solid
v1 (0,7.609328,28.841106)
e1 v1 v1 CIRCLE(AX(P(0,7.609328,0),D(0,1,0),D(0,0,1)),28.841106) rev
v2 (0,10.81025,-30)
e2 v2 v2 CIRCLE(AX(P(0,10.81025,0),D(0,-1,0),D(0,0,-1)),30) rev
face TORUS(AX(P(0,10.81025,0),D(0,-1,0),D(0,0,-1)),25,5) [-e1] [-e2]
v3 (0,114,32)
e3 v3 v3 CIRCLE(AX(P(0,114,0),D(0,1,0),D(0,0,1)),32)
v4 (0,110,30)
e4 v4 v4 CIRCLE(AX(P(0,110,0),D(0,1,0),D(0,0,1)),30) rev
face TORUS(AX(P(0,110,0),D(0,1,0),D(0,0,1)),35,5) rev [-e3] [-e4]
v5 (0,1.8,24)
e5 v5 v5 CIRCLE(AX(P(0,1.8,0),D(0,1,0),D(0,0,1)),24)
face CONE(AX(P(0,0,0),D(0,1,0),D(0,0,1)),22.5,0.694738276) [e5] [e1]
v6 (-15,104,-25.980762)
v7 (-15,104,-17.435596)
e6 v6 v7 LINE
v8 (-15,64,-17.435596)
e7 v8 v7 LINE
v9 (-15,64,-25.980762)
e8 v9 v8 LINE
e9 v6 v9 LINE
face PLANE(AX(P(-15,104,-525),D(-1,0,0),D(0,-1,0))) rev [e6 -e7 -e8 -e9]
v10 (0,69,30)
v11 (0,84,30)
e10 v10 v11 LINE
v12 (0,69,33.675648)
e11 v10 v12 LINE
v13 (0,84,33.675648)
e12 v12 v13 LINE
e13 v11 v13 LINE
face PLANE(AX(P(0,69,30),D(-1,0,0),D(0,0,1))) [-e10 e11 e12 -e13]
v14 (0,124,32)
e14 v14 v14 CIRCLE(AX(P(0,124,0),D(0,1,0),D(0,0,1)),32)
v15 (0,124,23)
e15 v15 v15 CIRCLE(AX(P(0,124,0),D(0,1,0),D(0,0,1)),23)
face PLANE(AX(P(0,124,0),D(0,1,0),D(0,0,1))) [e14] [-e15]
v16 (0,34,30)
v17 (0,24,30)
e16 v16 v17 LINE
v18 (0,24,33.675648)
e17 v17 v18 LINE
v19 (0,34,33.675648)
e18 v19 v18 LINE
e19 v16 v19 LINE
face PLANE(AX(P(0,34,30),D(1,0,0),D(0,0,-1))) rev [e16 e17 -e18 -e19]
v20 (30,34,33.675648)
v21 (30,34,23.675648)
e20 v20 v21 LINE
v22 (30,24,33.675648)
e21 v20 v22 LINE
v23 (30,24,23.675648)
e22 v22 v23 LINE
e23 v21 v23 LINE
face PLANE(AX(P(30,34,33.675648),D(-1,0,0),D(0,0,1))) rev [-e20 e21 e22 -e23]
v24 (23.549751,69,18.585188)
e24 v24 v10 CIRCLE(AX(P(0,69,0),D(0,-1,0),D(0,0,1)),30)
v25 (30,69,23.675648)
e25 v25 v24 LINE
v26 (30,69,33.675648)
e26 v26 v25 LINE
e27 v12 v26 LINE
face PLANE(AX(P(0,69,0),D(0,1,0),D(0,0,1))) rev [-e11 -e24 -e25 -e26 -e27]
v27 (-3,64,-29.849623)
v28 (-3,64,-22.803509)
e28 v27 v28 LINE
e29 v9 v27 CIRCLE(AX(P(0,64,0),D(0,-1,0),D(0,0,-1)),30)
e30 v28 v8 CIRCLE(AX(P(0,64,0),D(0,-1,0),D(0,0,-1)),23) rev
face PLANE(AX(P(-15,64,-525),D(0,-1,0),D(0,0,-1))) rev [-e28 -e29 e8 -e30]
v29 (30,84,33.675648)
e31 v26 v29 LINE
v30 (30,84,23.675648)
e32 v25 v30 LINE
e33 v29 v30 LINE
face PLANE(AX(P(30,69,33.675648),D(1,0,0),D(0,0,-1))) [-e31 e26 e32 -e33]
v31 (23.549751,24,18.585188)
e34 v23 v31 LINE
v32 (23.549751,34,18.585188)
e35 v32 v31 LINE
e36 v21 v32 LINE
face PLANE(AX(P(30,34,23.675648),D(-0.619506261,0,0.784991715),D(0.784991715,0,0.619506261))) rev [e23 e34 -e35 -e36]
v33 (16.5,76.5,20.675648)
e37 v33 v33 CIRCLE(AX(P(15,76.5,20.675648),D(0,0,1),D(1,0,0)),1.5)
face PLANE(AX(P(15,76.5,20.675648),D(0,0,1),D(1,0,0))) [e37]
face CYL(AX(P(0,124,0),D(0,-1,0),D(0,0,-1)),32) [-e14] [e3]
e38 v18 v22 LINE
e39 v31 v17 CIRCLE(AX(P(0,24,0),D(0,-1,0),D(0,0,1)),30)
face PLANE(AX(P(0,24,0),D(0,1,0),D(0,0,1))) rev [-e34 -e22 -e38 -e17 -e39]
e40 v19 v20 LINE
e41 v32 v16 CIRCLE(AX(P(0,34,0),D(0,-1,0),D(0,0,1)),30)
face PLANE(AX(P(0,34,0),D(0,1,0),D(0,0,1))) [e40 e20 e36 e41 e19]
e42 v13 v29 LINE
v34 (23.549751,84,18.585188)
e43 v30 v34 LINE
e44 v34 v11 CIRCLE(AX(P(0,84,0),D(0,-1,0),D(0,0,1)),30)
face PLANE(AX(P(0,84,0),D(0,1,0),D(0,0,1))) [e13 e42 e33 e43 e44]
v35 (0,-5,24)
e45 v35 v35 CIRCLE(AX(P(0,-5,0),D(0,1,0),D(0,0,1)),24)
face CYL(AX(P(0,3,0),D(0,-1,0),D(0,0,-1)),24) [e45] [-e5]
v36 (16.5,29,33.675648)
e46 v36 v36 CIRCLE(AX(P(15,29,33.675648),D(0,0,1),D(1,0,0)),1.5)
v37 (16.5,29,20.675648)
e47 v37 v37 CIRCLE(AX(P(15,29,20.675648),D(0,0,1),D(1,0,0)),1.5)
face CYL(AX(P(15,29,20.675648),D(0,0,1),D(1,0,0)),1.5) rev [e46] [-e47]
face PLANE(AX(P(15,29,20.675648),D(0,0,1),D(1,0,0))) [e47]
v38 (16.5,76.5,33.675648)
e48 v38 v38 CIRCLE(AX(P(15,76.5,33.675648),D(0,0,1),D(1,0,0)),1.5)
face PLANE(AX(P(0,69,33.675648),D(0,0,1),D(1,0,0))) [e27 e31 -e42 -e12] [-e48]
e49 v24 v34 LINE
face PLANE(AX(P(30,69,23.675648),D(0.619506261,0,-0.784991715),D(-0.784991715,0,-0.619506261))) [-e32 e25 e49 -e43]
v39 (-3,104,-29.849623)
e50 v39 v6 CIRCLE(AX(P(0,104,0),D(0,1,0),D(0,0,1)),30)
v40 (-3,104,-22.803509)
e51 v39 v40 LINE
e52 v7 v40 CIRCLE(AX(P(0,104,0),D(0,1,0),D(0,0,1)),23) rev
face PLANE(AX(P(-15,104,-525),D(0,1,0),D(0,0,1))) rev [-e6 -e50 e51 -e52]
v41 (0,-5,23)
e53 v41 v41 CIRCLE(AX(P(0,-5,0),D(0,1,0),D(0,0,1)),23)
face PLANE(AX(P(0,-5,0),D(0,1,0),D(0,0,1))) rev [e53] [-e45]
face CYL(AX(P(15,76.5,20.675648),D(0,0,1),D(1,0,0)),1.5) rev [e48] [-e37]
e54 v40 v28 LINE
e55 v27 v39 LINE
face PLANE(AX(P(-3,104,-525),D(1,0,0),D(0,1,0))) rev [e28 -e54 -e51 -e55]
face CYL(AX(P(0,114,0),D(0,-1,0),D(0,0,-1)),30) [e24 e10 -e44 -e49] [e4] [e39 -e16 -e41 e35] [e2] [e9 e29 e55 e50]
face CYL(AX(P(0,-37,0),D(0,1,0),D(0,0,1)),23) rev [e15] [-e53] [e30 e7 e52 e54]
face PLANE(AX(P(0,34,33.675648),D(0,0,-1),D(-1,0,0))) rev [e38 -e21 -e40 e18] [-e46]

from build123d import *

# Parameters (mm, degrees)
CROQUIS1_R                   = 22.5
CROQUIS2_R                   = 30
CROQUIS3_R                   = 30
SALIENTE_EXTRUIR1_DEPTH      = 105
CROQUIS4_R                   = 32
SALIENTE_EXTRUIR2_DEPTH      = 10
CROQUIS6_R                   = 23
CORTAR_EXTRUIR1_DEPTH        = 161
SALIENTE_EXTRUIR3_DEPTH      = 3
SALIENTE_EXTRUIR3_DEPTH_BACK = 5
CROQUIS7_R                   = 24
CROQUIS7_R_2                 = 23
REDONDEO1_R                  = 5
CROQUIS9_W                   = 12
CROQUIS9_H                   = 40
CORTAR_EXTRUIR2_DEPTH        = 525
SALIENTE_EXTRUIR4_START      = -15
SALIENTE_EXTRUIR4_DEPTH      = 15
SALIENTE_EXTRUIR5_DEPTH      = 10
CROQUIS12_R                  = 1.5
CORTAR_EXTRUIR3_DEPTH        = 13


with BuildPart() as part:
    # Croquis1 → Recubrir1 section 0
    with BuildSketch(Plane(origin=(0, 0, 0), x_dir=(1, 0, 0), z_dir=(0, 1, 0))):
        Circle(CROQUIS1_R)
    # Croquis2 → Recubrir1 section 1
    with BuildSketch(Plane(origin=(0, 9, 0), x_dir=(1, 0, 0), z_dir=(0, 1, 0))):
        Circle(CROQUIS2_R)
    loft()

    # Croquis3 → Saliente-Extruir1 (add)
    with BuildSketch(Plane(origin=(0, 9, 0), x_dir=(1, 0, 0), z_dir=(0, 1, 0))):
        with Locations(Location((0, 0, 0), (0, 0, 270))):
            Circle(CROQUIS3_R)
    extrude(amount=SALIENTE_EXTRUIR1_DEPTH)

    # Croquis4 → Saliente-Extruir2 (add)
    with BuildSketch(Plane(origin=(0, 114, 0), x_dir=(1, 0, 0), z_dir=(0, 1, 0))):
        with Locations(Location((0, 0, 0), (0, 0, 270))):
            Circle(CROQUIS4_R)
    extrude(amount=SALIENTE_EXTRUIR2_DEPTH)

    # Croquis6 → Cortar-Extruir1 (cut)
    with BuildSketch(Plane(origin=(0, 124, 0), x_dir=(1, 0, 0), z_dir=(0, 1, 0))):
        with Locations(Location((0, 0, 0), (0, 0, 270))):
            Circle(CROQUIS6_R)
    extrude(amount=-CORTAR_EXTRUIR1_DEPTH, mode=Mode.SUBTRACT)

    # Croquis7 → Saliente-Extruir3 (add, two sides: drawn at the far end of the back side and taken through both)
    with BuildSketch(Plane(origin=(0, 0, 0), x_dir=(1, 0, 0), z_dir=(0, 1, 0)).offset(-SALIENTE_EXTRUIR3_DEPTH_BACK)):
        with Locations(Location((0, 0, 0), (0, 0, 270))):
            Circle(CROQUIS7_R)
        with Locations(Location((0, 0, 0), (0, 0, 270))):
            Circle(CROQUIS7_R_2, mode=Mode.SUBTRACT)
    extrude(amount=SALIENTE_EXTRUIR3_DEPTH + SALIENTE_EXTRUIR3_DEPTH_BACK)

    # Redondeo1
    # the kernel refuses this fillet: 5 mm, written as the material it adds along each edge
    with BuildSketch(Plane(origin=(0, 114, 0), x_dir=(0, 0, 1), z_dir=(-1, 0, 0))) as redondeo1_piece_1:
        with BuildLine():
            CenterArc((35, -4), REDONDEO1_R, 126.869897646, 53.130102354)
            Line((32, 0), (30, 0))
            Line((30, 0), (30, -4))
        make_face()
    redondeo1_piece_1_solid = revolve(axis=Axis((0, 114, 0), (0, 1, 0)), mode=Mode.PRIVATE)
    add([redondeo1_piece_1_solid])
    # the kernel refuses this fillet: 5 mm, written as the material it takes off along each edge
    with BuildSketch(Plane(origin=(0, 9, 0), x_dir=(1, 0, 0), z_dir=(0, 0, 1))) as redondeo1_2_piece_1:
        with BuildLine():
            CenterArc((30 - REDONDEO1_R, REDONDEO1_R * 0.362049935181), REDONDEO1_R, 320.194428908, 39.805571092)
            Line((30, REDONDEO1_R * 0.362049935181), (30, 0))
            Line((30, 0), (30 - REDONDEO1_R * 0.231778720403, -REDONDEO1_R * 0.278134464483))
        make_face()
    redondeo1_2_piece_1_solid = revolve(axis=Axis((0, 9, 0), (0, 1, 0)), revolution_arc=270, mode=Mode.PRIVATE)
    with BuildSketch(Plane(origin=(0, 9, 0), x_dir=(0, 0, 1), z_dir=(-1, 0, 0))) as redondeo1_2_piece_2:
        with BuildLine():
            CenterArc((30 - REDONDEO1_R, REDONDEO1_R * 0.362049935181), REDONDEO1_R, 320.194428908, 39.805571092)
            Line((30, REDONDEO1_R * 0.362049935181), (30, 0))
            Line((30, 0), (30 - REDONDEO1_R * 0.231778720403, -REDONDEO1_R * 0.278134464483))
        make_face()
    redondeo1_2_piece_2_solid = revolve(axis=Axis((0, 9, 0), (0, 1, 0)), revolution_arc=90, mode=Mode.PRIVATE)
    add([redondeo1_2_piece_1_solid, redondeo1_2_piece_2_solid], mode=Mode.SUBTRACT)

    # Croquis9 → Cortar-Extruir2 (cut)
    with BuildSketch(Plane.XY):
        with Locations((-9, 84)):
            Rectangle(CROQUIS9_W, CROQUIS9_H)
    extrude(amount=-CORTAR_EXTRUIR2_DEPTH, mode=Mode.SUBTRACT)

    # Croquis10 → Saliente-Extruir4 (add)
    with BuildSketch(Plane(origin=(0, 84, 0), x_dir=(1, 0, 0), z_dir=(0, 1, 0)).offset(SALIENTE_EXTRUIR4_START)):
        with BuildLine():
            Line((0, -30), (0, -33.675648379))
            Line((0, -33.675648379), (30, -33.675648379))
            Line((30, -33.675648379), (30, -23.675648379))
            Line((30, -23.675648379), (23.549751452, -18.585187827))
            ThreePointArc((23.549751452, -18.585187827), (13.085189437, -26.995885194), (0, -30))
        make_face()
    extrude(amount=SALIENTE_EXTRUIR4_DEPTH)

    # Croquis11 → Saliente-Extruir5 (add)
    with BuildSketch(Plane(origin=(0, 24, 0), x_dir=(1, 0, 0), z_dir=(0, 1, 0))):
        with BuildLine():
            Line((30, -23.675648379), (23.549751452, -18.585187827))
            ThreePointArc((23.549751452, -18.585187827), (13.085189437, -26.995885194), (0, -30))
            Line((0, -30), (0, -33.675648379))
            Line((0, -33.675648379), (30, -33.675648379))
            Line((30, -33.675648379), (30, -23.675648379))
        make_face()
    extrude(amount=SALIENTE_EXTRUIR5_DEPTH)

    # Croquis12 → Cortar-Extruir3 (cut)
    with BuildSketch(Plane.XY.offset(33.675648379)):
        with Locations((15, 29)):
            Circle(CROQUIS12_R)
        with Locations((15, 76.5)):
            Circle(CROQUIS12_R)
    extrude(amount=-CORTAR_EXTRUIR3_DEPTH, mode=Mode.SUBTRACT)


solid = part.part
